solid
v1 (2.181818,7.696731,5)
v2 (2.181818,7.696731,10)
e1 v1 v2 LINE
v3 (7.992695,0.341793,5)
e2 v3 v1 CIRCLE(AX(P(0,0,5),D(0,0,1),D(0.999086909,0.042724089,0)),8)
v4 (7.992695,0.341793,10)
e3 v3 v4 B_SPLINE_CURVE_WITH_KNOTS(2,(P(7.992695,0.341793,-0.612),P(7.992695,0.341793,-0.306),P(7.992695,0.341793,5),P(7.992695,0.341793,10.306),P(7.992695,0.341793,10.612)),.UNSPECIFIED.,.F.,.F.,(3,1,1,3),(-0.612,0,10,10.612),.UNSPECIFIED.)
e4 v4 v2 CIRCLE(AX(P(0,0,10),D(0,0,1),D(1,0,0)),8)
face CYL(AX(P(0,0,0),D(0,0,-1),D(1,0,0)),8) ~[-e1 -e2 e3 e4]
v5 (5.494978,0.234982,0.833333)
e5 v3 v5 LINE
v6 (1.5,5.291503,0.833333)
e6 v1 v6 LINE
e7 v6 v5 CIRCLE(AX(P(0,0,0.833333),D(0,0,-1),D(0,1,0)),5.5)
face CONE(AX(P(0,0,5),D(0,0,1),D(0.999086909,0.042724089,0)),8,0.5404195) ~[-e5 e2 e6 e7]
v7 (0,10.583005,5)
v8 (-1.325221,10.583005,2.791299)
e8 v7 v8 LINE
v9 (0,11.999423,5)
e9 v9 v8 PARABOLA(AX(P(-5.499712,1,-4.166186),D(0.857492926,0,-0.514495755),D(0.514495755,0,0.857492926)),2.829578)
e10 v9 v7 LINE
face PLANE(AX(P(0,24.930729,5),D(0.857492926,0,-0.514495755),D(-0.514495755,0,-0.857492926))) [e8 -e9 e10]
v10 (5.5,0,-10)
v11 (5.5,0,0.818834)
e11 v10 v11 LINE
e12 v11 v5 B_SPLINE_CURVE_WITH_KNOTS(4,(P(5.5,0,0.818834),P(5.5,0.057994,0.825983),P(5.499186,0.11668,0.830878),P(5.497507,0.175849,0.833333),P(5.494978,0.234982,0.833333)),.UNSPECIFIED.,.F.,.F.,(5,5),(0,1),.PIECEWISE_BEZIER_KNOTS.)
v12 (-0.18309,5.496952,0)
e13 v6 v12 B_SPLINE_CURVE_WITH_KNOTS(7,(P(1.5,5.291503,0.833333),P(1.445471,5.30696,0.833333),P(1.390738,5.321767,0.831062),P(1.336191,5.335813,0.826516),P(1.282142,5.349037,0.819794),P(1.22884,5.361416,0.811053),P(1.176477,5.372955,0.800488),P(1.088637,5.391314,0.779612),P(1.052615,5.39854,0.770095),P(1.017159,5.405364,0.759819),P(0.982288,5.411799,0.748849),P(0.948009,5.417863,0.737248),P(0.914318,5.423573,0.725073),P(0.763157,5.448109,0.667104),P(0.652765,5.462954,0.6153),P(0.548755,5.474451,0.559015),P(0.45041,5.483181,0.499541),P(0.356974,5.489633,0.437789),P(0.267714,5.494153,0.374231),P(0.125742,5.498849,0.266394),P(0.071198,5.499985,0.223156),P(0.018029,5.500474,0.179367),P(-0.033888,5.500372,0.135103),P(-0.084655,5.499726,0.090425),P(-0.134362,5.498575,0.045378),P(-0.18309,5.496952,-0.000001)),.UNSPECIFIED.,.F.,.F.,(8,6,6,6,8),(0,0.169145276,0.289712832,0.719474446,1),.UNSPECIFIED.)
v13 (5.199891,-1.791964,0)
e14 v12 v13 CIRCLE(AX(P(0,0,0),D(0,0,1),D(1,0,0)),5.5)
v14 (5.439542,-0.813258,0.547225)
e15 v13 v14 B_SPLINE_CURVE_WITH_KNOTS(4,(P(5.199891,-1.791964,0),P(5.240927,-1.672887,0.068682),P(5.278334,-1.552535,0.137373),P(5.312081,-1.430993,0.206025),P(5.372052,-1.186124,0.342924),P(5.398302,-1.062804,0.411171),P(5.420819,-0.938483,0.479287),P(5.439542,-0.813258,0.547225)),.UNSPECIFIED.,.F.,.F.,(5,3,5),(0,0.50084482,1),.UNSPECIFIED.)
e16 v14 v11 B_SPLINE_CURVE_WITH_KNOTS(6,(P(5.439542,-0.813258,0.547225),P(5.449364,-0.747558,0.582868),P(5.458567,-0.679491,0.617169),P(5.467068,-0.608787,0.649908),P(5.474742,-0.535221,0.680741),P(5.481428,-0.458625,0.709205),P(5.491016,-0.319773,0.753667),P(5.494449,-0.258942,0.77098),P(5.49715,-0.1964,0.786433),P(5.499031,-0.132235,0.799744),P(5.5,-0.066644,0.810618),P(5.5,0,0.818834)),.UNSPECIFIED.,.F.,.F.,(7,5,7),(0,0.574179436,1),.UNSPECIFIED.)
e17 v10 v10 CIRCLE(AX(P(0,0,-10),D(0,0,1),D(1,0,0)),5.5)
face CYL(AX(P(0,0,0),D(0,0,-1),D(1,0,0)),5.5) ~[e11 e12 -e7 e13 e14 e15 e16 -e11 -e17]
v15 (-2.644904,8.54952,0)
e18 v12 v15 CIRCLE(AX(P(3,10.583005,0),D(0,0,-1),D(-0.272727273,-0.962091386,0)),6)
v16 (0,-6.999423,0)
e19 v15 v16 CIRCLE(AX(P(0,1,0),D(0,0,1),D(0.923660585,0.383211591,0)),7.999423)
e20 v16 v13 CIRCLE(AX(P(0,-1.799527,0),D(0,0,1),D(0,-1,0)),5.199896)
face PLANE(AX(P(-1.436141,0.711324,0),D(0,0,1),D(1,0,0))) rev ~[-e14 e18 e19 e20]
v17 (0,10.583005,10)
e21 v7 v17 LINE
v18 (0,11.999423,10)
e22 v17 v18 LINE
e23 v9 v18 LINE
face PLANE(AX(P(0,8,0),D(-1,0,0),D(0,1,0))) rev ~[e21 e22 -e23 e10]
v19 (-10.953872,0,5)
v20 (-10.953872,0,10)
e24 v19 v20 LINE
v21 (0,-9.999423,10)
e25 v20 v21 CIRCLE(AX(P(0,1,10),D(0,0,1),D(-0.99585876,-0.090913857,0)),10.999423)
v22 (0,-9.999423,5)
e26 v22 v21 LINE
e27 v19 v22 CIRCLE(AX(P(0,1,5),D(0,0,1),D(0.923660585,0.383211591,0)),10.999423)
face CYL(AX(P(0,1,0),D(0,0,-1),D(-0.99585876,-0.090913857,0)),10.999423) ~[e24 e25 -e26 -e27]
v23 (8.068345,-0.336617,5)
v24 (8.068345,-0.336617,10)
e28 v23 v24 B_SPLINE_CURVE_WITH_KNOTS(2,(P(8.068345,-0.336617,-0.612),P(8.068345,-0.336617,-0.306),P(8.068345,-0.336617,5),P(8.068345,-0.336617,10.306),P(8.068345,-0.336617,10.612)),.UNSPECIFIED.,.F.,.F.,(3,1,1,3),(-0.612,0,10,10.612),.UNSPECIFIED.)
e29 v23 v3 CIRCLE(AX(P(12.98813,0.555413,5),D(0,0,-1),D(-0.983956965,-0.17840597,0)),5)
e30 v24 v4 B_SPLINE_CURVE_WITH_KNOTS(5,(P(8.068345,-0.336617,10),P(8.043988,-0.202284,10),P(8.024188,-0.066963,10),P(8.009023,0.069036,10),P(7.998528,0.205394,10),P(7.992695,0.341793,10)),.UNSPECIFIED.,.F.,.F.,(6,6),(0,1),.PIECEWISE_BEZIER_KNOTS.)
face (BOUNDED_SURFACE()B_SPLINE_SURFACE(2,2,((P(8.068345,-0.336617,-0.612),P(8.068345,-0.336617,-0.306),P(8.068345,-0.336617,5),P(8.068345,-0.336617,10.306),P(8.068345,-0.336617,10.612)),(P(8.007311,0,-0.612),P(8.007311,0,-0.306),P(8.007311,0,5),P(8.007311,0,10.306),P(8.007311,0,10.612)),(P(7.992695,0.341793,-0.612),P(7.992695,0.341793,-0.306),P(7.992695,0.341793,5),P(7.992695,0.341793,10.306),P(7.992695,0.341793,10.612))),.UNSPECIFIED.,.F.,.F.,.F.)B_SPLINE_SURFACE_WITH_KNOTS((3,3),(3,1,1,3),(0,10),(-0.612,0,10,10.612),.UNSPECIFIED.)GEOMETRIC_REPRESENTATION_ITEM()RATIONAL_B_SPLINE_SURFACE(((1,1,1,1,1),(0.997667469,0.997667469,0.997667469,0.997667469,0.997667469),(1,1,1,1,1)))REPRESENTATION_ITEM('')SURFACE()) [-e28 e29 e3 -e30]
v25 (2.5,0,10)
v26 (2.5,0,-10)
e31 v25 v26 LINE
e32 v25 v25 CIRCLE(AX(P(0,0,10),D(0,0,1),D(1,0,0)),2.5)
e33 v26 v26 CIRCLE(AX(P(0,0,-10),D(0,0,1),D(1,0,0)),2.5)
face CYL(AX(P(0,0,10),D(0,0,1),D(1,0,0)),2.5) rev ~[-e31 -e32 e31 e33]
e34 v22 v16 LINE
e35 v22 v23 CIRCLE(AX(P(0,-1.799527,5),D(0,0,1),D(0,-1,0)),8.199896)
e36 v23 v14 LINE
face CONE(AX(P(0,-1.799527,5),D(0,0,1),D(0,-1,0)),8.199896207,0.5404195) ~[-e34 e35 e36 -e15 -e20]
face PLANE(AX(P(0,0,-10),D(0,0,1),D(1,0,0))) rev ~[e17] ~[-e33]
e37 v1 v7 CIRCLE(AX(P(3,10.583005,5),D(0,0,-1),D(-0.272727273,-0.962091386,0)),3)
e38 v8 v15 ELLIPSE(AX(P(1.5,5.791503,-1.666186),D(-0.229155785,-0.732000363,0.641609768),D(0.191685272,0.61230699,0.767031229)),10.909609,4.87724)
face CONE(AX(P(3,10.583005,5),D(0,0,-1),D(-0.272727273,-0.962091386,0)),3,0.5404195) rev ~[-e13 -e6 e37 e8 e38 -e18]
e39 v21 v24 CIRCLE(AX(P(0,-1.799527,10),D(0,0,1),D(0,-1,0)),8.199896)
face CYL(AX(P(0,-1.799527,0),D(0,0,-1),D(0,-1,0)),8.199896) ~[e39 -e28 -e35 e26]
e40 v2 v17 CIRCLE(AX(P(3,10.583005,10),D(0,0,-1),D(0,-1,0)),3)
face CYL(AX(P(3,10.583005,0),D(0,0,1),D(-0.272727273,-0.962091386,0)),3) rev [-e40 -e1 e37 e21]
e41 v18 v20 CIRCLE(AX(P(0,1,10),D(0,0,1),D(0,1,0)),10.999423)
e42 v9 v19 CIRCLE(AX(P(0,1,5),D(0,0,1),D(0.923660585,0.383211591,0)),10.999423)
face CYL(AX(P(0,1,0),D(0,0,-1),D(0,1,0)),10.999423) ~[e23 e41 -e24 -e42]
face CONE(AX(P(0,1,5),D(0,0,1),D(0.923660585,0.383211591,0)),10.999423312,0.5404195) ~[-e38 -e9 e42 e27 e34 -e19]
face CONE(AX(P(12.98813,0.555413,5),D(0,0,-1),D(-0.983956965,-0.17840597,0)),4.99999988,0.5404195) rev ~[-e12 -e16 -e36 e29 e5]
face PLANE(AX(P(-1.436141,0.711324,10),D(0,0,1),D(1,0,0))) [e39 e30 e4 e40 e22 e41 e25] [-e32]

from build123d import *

# Parameters (mm, degrees)
F1_DEPTH      = 10
F2_R          = 5
F3_R          = 3
F4_T1_DEPTH   = 14.3477235542
F4_T4_ANGLE   = 100.2769257202
F4_T6_ANGLE   = 247.4672415992
F4_T8_ANGLE   = 7.8282705893
F4_T10_ANGLE  = 71.7247245492
F4_T12_ANGLE  = 74.1733798681
F5_R          = 5.5
F6_DEPTH      = 10
F6_DEPTH_BACK = 5
F7_R          = 2.5
F8_DEPTH      = 20.0010001


# Not quite as in the source:
# - a fillet or chamfer that OpenCascade refuses, or shapes differently, is made with other operations: its cross-section is extruded or revolved along the edge and cut away or added


with BuildPart() as f1:
    # F0 (on Top) → F1 (new body)
    with BuildSketch(Plane.XY):
        with BuildLine():
            ThreePointArc((0, 11.9994233124), (-8.123630239, 8.4157902443), (-10.9538720645, 0))
            ThreePointArc((-10.9538720645, 0), (-7.4157902443, -7.123630239), (0, -9.9994233124))
            ThreePointArc((0, -9.9994233124), (6.4028990813, -6.9221417854), (8, 0))
            ThreePointArc((8, 0), (5.6568542495, 5.6568542495), (0, 8))
            Line((0, 8), (0, 11.9994233124))
        make_face()
    extrude(amount=F1_DEPTH)

    # F2
    f2_edges = [f1.edges().sort_by_distance(p)[0] for p in [
        (8, 0, 5),
    ]]
    fillet(f2_edges, radius=F2_R)

    # F3
    f3_edges = [f1.edges().sort_by_distance(p)[0] for p in [
        (0, 8, 5),
    ]]
    fillet(f3_edges, radius=F3_R)

    # F4: chamfer of 5 x 3 on 5 edges, made by hand

    # F4_s2 → F4_t1 (cut)
    with BuildSketch(Plane.XZ.offset(-24.9307287984)):
        Polygon((0, 5), (-3, 0), (0, 0), align=None)
    extrude(amount=F4_T1_DEPTH, mode=Mode.SUBTRACT)

    # F4_s3 → F4_t4 (revolve, cut)
    with BuildSketch(Plane.YZ):
        Polygon((-9.9994233124, 5), (-6.9994233124, 0), (-9.9994233124, 0), align=None)
    revolve(axis=Axis((0, -1.7995271056, 0), (0, 0, 1)), revolution_arc=F4_T4_ANGLE, mode=Mode.SUBTRACT)

    # F4_s5 → F4_t6 (revolve, cut)
    with BuildSketch(Plane(origin=(-0.353957442, 0.8531488769, 0), x_dir=(0, 0, 1), z_dir=(0.3832115905, -0.9236605853, 0))):
        Polygon((5, -11.3826349029), (0, -8.3826349029), (0, -11.3826349029), align=None)
    revolve(axis=Axis((0, 1, 0), (0, 0, 1)), revolution_arc=F4_T6_ANGLE, mode=Mode.SUBTRACT)

    # F4_s7 → F4_t8 (revolve, cut)
    with BuildSketch(Plane(origin=(0.315895823, -1.7422505282, 0), x_dir=(0, 0, 1), z_dir=(0.1784059699, -0.9839569655, 0))):
        Polygon((5, -7.8788498285), (0, -4.8788498282), (0, -7.8788498282), align=None)
    revolve(axis=Axis((12.9881297006, 0.5554131457, 0), (0, 0, -1)), revolution_arc=F4_T8_ANGLE, mode=Mode.SUBTRACT)

    # F4_s9 → F4_t10 (revolve, cut)
    with BuildSketch(Plane(origin=(0, 0, 0), x_dir=(0, 0, 1), z_dir=(0.0427240892, -0.9990869092, 0))):
        Polygon((5, -8), (0, -5), (0, -8), align=None)
    revolve(axis=Axis((0, 0, 0), (0, 0, 1)), revolution_arc=F4_T10_ANGLE, mode=Mode.SUBTRACT)

    # F4_s11 → F4_t12 (revolve, cut)
    with BuildSketch(Plane(origin=(0, 0, 0), x_dir=(0, 0, 1), z_dir=(0.9620913858, -0.2727272727, 0))):
        Polygon((5, -8), (0, -5), (0, -8), align=None)
    revolve(axis=Axis((3, 10.5830052443, 0), (0, 0, -1)), revolution_arc=F4_T12_ANGLE, mode=Mode.SUBTRACT)

    # F5 (on face) → F6 (join, two sides)
    with BuildSketch(Plane.XY) as f6_sk:
        Circle(F5_R)
    extrude(amount=-F6_DEPTH)
    extrude(f6_sk.sketch, amount=F6_DEPTH_BACK)

    # F7 (on face) → F8 (cut, through all)
    with BuildSketch(Plane.XY.offset(10)):
        Circle(F7_R)
    extrude(amount=-F8_DEPTH, mode=Mode.SUBTRACT)


solid = f1.part
